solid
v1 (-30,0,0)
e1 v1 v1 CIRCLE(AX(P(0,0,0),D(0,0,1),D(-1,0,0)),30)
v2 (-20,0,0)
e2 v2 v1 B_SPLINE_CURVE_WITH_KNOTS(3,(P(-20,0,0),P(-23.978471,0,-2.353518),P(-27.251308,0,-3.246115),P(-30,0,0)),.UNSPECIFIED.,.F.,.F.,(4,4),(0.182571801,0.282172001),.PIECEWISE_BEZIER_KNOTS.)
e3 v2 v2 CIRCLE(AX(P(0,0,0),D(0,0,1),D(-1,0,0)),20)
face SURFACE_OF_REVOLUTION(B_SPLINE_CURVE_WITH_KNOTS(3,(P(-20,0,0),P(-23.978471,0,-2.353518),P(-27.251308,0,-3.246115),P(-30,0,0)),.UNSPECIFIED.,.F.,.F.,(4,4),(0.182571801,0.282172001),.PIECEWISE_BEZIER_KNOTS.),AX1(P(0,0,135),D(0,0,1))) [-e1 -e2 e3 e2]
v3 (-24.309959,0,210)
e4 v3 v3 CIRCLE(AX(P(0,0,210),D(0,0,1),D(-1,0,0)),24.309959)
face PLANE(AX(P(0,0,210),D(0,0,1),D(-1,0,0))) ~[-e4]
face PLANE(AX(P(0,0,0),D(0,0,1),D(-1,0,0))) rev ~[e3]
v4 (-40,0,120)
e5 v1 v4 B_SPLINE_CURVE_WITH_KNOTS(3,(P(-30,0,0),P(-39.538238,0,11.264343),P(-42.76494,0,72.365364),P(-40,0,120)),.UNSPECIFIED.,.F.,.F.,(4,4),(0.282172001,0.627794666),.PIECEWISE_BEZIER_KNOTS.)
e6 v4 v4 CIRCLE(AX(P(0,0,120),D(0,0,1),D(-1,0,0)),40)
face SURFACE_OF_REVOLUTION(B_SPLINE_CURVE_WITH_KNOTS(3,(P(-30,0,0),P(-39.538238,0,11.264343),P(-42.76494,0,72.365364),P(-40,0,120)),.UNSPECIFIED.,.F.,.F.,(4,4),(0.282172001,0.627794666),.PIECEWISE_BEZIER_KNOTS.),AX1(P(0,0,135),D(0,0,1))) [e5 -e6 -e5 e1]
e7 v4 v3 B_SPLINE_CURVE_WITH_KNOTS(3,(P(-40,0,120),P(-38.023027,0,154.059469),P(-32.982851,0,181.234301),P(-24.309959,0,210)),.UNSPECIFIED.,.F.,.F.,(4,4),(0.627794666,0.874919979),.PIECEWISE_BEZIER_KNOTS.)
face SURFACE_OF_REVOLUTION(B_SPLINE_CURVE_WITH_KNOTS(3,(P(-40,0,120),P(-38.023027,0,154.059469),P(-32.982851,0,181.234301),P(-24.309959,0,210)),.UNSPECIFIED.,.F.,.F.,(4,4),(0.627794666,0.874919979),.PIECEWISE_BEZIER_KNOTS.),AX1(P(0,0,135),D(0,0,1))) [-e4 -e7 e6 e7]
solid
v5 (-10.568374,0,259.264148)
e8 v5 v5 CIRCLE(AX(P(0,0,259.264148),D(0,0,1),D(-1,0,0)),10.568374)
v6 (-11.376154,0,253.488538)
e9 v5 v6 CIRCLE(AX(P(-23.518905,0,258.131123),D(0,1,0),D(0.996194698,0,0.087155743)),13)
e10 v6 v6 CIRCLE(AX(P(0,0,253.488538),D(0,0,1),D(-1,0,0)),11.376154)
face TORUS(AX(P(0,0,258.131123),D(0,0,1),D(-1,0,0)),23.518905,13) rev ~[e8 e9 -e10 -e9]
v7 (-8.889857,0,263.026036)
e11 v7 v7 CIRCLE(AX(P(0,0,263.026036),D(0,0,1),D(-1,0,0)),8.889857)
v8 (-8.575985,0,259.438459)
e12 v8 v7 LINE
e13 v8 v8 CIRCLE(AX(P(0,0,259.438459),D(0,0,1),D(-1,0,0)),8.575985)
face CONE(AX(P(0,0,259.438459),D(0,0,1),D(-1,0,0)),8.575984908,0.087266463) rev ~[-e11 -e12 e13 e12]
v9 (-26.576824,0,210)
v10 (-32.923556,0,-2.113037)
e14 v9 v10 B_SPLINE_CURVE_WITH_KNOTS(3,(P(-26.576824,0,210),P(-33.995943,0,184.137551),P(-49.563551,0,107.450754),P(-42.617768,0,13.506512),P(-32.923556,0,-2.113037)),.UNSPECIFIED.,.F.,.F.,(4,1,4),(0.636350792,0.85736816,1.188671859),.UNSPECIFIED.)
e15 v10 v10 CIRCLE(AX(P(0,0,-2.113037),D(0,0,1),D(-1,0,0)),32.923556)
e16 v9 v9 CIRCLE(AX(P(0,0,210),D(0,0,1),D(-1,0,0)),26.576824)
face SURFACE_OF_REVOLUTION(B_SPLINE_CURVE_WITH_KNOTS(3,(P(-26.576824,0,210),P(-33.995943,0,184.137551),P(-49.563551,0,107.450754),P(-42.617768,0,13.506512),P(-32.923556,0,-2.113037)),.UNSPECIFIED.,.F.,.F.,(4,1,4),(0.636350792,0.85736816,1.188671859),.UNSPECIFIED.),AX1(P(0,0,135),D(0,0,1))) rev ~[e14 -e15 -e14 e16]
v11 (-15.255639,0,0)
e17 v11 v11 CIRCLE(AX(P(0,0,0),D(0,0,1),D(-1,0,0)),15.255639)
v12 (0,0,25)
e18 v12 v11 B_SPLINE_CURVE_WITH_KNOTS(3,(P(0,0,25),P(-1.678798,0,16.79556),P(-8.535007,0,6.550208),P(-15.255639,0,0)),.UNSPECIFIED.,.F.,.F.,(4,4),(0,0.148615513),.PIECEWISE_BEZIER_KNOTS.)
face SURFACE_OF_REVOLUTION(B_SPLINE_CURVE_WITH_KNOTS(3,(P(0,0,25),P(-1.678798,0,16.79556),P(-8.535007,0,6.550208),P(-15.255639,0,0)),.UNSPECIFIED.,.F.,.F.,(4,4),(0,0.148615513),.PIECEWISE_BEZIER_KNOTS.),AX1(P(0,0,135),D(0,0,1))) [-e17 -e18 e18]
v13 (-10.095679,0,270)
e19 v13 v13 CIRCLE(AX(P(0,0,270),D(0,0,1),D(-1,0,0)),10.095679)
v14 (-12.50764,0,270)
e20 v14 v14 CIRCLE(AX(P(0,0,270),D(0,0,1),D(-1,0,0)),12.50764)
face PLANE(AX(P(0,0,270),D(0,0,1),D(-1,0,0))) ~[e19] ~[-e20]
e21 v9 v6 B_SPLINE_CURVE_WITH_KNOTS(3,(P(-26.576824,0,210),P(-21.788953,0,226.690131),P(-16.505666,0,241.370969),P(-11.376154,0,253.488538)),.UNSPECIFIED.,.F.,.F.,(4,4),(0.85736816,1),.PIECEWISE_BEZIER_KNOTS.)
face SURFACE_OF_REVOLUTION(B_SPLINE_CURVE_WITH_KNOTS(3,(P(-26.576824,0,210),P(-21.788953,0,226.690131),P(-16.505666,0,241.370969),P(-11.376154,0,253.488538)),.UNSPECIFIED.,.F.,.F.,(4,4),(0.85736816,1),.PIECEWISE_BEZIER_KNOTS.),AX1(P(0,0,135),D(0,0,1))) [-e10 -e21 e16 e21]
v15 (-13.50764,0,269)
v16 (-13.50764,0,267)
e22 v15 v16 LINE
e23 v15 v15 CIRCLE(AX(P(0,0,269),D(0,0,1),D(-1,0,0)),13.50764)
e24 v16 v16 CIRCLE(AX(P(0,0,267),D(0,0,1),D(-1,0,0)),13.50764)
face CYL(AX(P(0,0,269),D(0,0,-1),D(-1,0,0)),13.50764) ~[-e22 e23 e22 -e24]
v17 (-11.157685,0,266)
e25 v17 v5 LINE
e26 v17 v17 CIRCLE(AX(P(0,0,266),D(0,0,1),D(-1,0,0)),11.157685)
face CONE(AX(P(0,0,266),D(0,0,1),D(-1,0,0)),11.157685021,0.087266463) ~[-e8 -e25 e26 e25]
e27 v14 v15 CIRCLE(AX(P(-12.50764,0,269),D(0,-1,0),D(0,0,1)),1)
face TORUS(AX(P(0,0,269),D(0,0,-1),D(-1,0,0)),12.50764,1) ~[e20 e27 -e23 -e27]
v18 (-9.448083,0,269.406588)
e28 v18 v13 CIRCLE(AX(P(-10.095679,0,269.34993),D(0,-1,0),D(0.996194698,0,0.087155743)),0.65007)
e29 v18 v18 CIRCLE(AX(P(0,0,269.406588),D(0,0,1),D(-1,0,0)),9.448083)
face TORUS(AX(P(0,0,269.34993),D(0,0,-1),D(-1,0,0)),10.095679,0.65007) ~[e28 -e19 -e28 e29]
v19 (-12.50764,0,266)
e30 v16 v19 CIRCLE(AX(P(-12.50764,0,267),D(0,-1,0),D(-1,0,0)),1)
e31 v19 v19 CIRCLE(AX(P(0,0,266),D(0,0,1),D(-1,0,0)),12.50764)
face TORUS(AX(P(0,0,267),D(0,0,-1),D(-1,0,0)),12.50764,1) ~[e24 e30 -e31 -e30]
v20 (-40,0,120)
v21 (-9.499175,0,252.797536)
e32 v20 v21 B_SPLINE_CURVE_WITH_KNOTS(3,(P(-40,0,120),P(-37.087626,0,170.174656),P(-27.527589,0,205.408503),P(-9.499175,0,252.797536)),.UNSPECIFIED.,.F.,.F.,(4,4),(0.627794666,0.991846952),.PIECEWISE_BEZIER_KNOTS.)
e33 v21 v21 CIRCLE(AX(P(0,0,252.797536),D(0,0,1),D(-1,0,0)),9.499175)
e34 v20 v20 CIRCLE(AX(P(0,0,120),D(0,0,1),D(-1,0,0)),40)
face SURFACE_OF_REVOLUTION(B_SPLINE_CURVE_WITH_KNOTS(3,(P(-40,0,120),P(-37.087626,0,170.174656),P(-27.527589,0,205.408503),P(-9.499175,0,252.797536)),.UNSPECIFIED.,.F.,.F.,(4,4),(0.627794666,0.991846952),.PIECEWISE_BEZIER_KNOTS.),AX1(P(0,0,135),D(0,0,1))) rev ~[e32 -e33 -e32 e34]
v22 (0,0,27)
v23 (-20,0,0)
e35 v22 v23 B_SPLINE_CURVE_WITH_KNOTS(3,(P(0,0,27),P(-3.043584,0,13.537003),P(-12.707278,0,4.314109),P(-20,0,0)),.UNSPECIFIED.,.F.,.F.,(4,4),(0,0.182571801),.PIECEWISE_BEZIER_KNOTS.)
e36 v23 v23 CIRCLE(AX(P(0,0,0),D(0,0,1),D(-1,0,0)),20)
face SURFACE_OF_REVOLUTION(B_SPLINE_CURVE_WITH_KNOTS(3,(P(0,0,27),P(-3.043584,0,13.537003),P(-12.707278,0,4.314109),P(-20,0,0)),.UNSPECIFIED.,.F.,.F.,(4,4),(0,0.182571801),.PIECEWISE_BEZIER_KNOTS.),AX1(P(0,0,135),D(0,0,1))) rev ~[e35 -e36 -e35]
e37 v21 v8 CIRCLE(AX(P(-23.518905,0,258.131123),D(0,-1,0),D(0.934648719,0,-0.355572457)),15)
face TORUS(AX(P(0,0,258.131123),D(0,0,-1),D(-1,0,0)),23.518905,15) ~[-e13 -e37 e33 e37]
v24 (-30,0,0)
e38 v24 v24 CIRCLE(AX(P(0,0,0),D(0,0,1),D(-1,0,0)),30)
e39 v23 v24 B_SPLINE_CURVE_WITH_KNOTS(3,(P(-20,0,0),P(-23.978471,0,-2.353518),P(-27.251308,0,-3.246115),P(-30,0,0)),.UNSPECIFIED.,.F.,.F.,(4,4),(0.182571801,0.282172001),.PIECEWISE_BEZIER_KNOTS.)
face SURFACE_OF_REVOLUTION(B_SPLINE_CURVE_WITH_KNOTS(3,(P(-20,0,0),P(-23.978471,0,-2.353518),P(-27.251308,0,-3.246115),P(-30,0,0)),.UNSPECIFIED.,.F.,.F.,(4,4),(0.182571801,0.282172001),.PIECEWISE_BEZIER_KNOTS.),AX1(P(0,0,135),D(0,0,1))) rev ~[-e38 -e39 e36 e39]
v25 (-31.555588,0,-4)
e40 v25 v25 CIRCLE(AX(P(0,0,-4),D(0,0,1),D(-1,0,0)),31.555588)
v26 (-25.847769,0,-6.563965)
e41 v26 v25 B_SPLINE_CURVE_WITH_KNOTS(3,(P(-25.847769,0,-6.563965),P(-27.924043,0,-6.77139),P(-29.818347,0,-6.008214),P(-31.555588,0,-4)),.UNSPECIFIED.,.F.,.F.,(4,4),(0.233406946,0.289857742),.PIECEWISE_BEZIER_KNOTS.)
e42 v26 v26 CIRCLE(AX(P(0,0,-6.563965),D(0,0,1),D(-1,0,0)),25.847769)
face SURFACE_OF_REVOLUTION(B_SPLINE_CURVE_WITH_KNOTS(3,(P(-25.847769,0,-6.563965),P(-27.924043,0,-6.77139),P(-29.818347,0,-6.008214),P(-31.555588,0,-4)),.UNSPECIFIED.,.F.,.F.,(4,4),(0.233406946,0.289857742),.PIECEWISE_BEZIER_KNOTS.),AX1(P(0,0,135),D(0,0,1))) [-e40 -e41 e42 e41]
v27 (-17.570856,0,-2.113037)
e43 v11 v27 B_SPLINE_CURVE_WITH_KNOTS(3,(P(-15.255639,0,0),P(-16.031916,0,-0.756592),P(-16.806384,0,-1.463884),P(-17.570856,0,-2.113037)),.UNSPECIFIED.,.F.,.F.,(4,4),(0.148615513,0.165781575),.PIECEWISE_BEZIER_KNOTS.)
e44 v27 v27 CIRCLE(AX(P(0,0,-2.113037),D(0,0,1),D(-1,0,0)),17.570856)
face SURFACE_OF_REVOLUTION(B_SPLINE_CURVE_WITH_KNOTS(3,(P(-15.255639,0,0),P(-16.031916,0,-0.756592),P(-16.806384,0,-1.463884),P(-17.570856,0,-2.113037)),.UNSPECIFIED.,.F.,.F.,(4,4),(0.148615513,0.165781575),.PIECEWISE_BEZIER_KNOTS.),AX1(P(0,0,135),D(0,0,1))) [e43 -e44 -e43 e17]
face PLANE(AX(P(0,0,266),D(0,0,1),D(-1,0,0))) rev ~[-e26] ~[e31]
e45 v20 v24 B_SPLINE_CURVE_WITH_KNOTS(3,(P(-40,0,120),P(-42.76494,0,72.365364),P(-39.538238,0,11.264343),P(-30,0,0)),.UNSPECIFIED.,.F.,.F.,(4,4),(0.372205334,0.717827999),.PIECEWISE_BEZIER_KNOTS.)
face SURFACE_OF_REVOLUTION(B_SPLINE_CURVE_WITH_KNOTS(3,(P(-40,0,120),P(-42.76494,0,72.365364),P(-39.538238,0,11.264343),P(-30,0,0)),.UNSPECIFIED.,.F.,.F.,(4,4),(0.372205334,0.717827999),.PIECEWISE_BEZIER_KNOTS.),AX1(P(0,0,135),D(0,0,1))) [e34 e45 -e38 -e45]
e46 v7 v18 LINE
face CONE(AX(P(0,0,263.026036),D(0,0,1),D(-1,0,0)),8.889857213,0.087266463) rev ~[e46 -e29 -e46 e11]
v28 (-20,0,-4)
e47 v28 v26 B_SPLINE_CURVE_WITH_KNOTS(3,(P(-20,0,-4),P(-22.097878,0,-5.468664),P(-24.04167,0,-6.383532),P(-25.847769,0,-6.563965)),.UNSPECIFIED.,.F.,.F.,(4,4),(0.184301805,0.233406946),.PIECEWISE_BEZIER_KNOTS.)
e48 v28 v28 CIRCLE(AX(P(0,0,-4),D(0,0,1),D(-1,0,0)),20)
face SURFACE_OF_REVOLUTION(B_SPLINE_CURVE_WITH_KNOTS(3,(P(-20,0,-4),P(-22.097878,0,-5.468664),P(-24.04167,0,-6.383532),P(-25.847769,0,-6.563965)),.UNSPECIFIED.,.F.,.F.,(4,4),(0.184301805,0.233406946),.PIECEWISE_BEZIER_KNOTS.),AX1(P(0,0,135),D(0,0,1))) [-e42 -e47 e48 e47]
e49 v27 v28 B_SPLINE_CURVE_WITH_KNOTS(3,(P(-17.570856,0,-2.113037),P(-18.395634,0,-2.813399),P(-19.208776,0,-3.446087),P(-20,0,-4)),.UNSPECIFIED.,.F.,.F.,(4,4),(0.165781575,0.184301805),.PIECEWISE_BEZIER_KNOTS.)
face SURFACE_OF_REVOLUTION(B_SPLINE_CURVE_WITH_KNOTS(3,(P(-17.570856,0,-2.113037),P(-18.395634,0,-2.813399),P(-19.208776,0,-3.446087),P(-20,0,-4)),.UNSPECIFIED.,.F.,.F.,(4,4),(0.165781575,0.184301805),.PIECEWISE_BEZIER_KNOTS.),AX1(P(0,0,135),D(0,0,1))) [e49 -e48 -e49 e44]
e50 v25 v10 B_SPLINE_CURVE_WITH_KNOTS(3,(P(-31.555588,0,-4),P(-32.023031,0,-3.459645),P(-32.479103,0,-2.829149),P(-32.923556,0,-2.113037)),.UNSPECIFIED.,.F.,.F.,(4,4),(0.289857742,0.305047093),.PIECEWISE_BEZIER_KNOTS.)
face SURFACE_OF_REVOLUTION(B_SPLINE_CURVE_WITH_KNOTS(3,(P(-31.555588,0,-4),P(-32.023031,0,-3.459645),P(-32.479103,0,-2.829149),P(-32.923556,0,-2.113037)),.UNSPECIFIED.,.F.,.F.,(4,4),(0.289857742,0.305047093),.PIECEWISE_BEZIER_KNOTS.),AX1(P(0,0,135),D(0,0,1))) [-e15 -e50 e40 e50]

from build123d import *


# Not quite as in the source:
# - the dataset's text gives a spline's control points without its knots; the knots are read off the source's solid
# - a feature names something its author has since deleted; it is built from what else it names


with BuildPart() as f2:
    # F0 (on Front) → F2 (revolve)
    with BuildSketch(Plane.XZ):
        with BuildLine():
            Line((-20, 0), (0, 0))
            Line((0, 0), (0, 27))
            add(Edge.make_bspline(
                [(0, 27), (-3.0435841749, 13.5370031673), (-12.7072780328, 4.3141087628), (-20, 0)],
                knots=[0, 0, 0, 0, 0.1825718006, 0.1825718006, 0.1825718006, 0.1825718006], degree=3))
        make_face()
        with BuildLine():
            add(Edge.make_bspline(
                [(0, 27), (-3.0435841749, 13.5370031673), (-12.7072780328, 4.3141087628), (-20, 0)],
                knots=[0, 0, 0, 0, 0.1825718006, 0.1825718006, 0.1825718006, 0.1825718006], degree=3))
            Line((0, 27), (0, 120))
            Line((0, 120), (-40, 120))
            add(Edge.make_bspline(
                [(-30, 0), (-39.5382376048, 11.2643426863), (-42.7649396023, 72.3653635063), (-40, 120)],
                knots=[0.2821720012, 0.2821720012, 0.2821720012, 0.2821720012, 0.6277946656, 0.6277946656, 0.6277946656, 0.6277946656], degree=3))
            Line((-30, 0), (-20, 0))
        make_face()
        with BuildLine():
            add(Edge.make_bspline(
                [(-20, 0), (-23.9784707647, -2.3535184347), (-27.2513076339, -3.2461146423), (-30, 0)],
                knots=[0.1825718006, 0.1825718006, 0.1825718006, 0.1825718006, 0.2821720012, 0.2821720012, 0.2821720012, 0.2821720012], degree=3))
            Line((-20, 0), (-30, 0))
        make_face()
        with BuildLine():
            Line((-40, 120), (0, 120))
            Line((0, 120), (0, 210))
            Line((0, 210), (-24.3099592218, 210))
            add(Edge.make_bspline(
                [(-40, 120), (-38.0230273149, 154.0594691969), (-32.9828510043, 181.2343014203), (-24.3099592218, 210)],
                knots=[0.6277946656, 0.6277946656, 0.6277946656, 0.6277946656, 0.8749199794, 0.8749199794, 0.8749199794, 0.8749199794], degree=3))
        make_face()
    revolve(axis=Axis((0, 0, 135), (0, 0, 1)))


with BuildPart() as f3:
    # F1 (on Front) → F3 (revolve)
    with BuildSketch(Plane.XZ):
        with BuildLine():
            add(Edge.make_bspline(
                [(0, 27), (-3.0435841749, 13.5370031673), (-12.7072780328, 4.3141087628), (-20, 0)],
                knots=[0, 0, 0, 0, 0.1825718006, 0.1825718006, 0.1825718006, 0.1825718006], degree=3))
            Line((-20, 0), (-15.2556389478, 0))
            add(Edge.make_bspline(
                [(0, 25), (-1.6787983695, 16.7955598221), (-8.5350065401, 6.550208015), (-15.2556389478, 0)],
                knots=[0, 0, 0, 0, 0.1486155133, 0.1486155133, 0.1486155133, 0.1486155133], degree=3))
            Line((0, 25), (0, 27))
        make_face()
        with BuildLine():
            add(Edge.make_bspline(
                [(-20, 0), (-22.1448686295, -1.2688261792), (-24.0846453693, -2.1130365594), (-25.8477685975, -2.1130365594)],
                knots=[0.1825718006, 0.1825718006, 0.1825718006, 0.1825718006, 0.2362681474, 0.2362681474, 0.2362681474, 0.2362681474], degree=3))
            Line((-25.8477685975, -2.1130365594), (-17.5708555504, -2.1130365594))
            add(Edge.make_bspline(
                [(-15.2556389478, 0), (-16.0319158442, -0.7565917669), (-16.8063839216, -1.463883822), (-17.5708555504, -2.1130365594)],
                knots=[0.1486155133, 0.1486155133, 0.1486155133, 0.1486155133, 0.1657815748, 0.1657815748, 0.1657815748, 0.1657815748], degree=3))
            Line((-15.2556389478, 0), (-20, 0))
        make_face()
        with BuildLine():
            Line((-17.5708555504, -2.1130365594), (-25.8477685975, -2.1130365594))
            Line((-25.8477685975, -2.1130365594), (-25.8477685975, -4))
            Line((-25.8477685975, -4), (-20, -4))
            add(Edge.make_bspline(
                [(-17.5708555504, -2.1130365594), (-18.395633586, -2.8133986127), (-19.2087757969, -3.4460867419), (-20, -4)],
                knots=[0.1657815748, 0.1657815748, 0.1657815748, 0.1657815748, 0.1843018049, 0.1843018049, 0.1843018049, 0.1843018049], degree=3))
        make_face()
        with BuildLine():
            Line((-20, -4), (-25.8477685975, -4))
            Line((-25.8477685975, -4), (-25.8477685975, -6.5639654895))
            add(Edge.make_bspline(
                [(-20, -4), (-22.0978776141, -5.4686636477), (-24.0416695595, -6.3835324972), (-25.8477685975, -6.5639654895)],
                knots=[0.1843018049, 0.1843018049, 0.1843018049, 0.1843018049, 0.2334069461, 0.2334069461, 0.2334069461, 0.2334069461], degree=3))
        make_face()
        with BuildLine():
            Line((-25.8477685975, -4), (-31.5555878147, -4))
            add(Edge.make_bspline(
                [(-25.8477685975, -6.5639654895), (-27.9240425881, -6.7713895128), (-29.8183474252, -6.0082140057), (-31.5555878147, -4)],
                knots=[0.2334069461, 0.2334069461, 0.2334069461, 0.2334069461, 0.2898577417, 0.2898577417, 0.2898577417, 0.2898577417], degree=3))
            Line((-25.8477685975, -6.5639654895), (-25.8477685975, -4))
        make_face()
        with BuildLine():
            Line((-25.8477685975, -2.1130365594), (-32.9235558692, -2.1130365594))
            add(Edge.make_bspline(
                [(-31.5555878147, -4), (-32.0230312661, -3.4596450258), (-32.4791032579, -2.8291493145), (-32.9235558692, -2.1130365594)],
                knots=[0.2898577417, 0.2898577417, 0.2898577417, 0.2898577417, 0.3050470931, 0.3050470931, 0.3050470931, 0.3050470931], degree=3))
            Line((-31.5555878147, -4), (-25.8477685975, -4))
            Line((-25.8477685975, -4), (-25.8477685975, -2.1130365594))
        make_face()
        with BuildLine():
            add(Edge.make_bspline(
                [(-40, 120), (-42.7649396023, 72.3653635064), (-39.5382376044, 11.2643426796), (-29.9999999979, -2.5e-09)],
                knots=[0.3722053344, 0.3722053344, 0.3722053344, 0.3722053344, 0.7178279988, 0.7178279988, 0.7178279988, 0.7178279988], degree=3))
            Line((-39.9999999997, 120), (-42.8499999997, 120))
            add(Edge.make_bspline(
                [(-32.9235558692, -2.1130365594), (-42.6177679766, 13.5065115388), (-46.7841195001, 69.857928704), (-42.8499999997, 120)],
                knots=[0.3050470931, 0.3050470931, 0.3050470931, 0.3050470931, 0.6363507917, 0.6363507917, 0.6363507917, 0.6363507917], degree=3))
            Line((-32.9235558692, -2.1130365594), (-25.8477685975, -2.1130365594))
            add(Edge.make_bspline(
                [(-25.8477685975, -2.1130365594), (-27.3550247862, -2.1130365594), (-28.7331795332, -1.4960730118), (-30, 0)],
                knots=[0.2362681474, 0.2362681474, 0.2362681474, 0.2362681474, 0.2821720012, 0.2821720012, 0.2821720012, 0.2821720012], degree=3))
        make_face()
        with BuildLine():
            Line((-42.8499999997, 120), (-39.9999999997, 120))
            add(Edge.make_bspline(
                [(-40, 120), (-38.0230273149, 154.0594691969), (-32.9828510043, 181.2343014203), (-24.3099592218, 210)],
                knots=[0.6277946656, 0.6277946656, 0.6277946656, 0.6277946656, 0.8749199794, 0.8749199794, 0.8749199794, 0.8749199794], degree=3))
            Line((-24.3099592218, 210), (-26.5768238075, 210))
            add(Edge.make_bspline(
                [(-42.8499999997, 120), (-40.225493413, 153.450482725), (-33.9959433083, 184.1375505806), (-26.5768238075, 210)],
                knots=[0.6363507917, 0.6363507917, 0.6363507917, 0.6363507917, 0.8573681601, 0.8573681601, 0.8573681601, 0.8573681601], degree=3))
        make_face()
        with BuildLine():
            Line((-26.5768238075, 210), (-24.3099592218, 210))
            add(Edge.make_bspline(
                [(-24.3099592218, 210), (-20.2063934623, 223.6104472072), (-15.2895734867, 237.5770408788), (-9.4991745947, 252.797536172)],
                knots=[0.8749199794, 0.8749199794, 0.8749199794, 0.8749199794, 0.9918469515, 0.9918469515, 0.9918469515, 0.9918469515], degree=3))
            ThreePointArc((-9.4991745945, 252.7975361725), (-8.6617772414, 256.0657553835), (-8.5759849078, 259.4384591674))
            Line((-8.5759849078, 259.4384591674), (-8.8898572134, 263.0260360371))
            Line((-8.8898572134, 263.0260360371), (-9.4480831534, 269.4065877275))
            ThreePointArc((-9.4480831534, 269.4065877275), (-9.6564983762, 269.8292119917), (-10.095679011, 270))
            Line((-10.095679011, 270), (-11.5076396751, 270))
            Line((-11.5076396751, 270), (-11.157685021, 266))
            Line((-11.157685021, 266), (-10.568374304, 259.2641476819))
            ThreePointArc((-10.568374304, 259.2641476819), (-10.6442162454, 256.3304621171), (-11.3761540968, 253.4885384772))
            add(Edge.make_bspline(
                [(-26.5768238075, 210), (-21.7889527374, 226.6901305963), (-16.5056657637, 241.3709688307), (-11.3761540968, 253.4885384772)],
                knots=[0.8573681601, 0.8573681601, 0.8573681601, 0.8573681601, 1, 1, 1, 1], degree=3))
        make_face()
        with BuildLine():
            Line((-12.5076396751, 266), (-11.157685021, 266))
            Line((-11.157685021, 266), (-11.5076396751, 270))
            Line((-11.5076396751, 270), (-12.5076396751, 270))
            ThreePointArc((-12.5076396751, 270), (-13.2147464563, 269.7071067812), (-13.5076396751, 269))
            Line((-13.5076396751, 269), (-13.5076396751, 267))
            ThreePointArc((-13.5076396751, 267), (-13.2147464563, 266.2928932188), (-12.5076396751, 266))
        make_face()
    revolve(axis=Axis((0, 0, 135), (0, 0, 1)))


solid = Compound([f2.part, f3.part])
